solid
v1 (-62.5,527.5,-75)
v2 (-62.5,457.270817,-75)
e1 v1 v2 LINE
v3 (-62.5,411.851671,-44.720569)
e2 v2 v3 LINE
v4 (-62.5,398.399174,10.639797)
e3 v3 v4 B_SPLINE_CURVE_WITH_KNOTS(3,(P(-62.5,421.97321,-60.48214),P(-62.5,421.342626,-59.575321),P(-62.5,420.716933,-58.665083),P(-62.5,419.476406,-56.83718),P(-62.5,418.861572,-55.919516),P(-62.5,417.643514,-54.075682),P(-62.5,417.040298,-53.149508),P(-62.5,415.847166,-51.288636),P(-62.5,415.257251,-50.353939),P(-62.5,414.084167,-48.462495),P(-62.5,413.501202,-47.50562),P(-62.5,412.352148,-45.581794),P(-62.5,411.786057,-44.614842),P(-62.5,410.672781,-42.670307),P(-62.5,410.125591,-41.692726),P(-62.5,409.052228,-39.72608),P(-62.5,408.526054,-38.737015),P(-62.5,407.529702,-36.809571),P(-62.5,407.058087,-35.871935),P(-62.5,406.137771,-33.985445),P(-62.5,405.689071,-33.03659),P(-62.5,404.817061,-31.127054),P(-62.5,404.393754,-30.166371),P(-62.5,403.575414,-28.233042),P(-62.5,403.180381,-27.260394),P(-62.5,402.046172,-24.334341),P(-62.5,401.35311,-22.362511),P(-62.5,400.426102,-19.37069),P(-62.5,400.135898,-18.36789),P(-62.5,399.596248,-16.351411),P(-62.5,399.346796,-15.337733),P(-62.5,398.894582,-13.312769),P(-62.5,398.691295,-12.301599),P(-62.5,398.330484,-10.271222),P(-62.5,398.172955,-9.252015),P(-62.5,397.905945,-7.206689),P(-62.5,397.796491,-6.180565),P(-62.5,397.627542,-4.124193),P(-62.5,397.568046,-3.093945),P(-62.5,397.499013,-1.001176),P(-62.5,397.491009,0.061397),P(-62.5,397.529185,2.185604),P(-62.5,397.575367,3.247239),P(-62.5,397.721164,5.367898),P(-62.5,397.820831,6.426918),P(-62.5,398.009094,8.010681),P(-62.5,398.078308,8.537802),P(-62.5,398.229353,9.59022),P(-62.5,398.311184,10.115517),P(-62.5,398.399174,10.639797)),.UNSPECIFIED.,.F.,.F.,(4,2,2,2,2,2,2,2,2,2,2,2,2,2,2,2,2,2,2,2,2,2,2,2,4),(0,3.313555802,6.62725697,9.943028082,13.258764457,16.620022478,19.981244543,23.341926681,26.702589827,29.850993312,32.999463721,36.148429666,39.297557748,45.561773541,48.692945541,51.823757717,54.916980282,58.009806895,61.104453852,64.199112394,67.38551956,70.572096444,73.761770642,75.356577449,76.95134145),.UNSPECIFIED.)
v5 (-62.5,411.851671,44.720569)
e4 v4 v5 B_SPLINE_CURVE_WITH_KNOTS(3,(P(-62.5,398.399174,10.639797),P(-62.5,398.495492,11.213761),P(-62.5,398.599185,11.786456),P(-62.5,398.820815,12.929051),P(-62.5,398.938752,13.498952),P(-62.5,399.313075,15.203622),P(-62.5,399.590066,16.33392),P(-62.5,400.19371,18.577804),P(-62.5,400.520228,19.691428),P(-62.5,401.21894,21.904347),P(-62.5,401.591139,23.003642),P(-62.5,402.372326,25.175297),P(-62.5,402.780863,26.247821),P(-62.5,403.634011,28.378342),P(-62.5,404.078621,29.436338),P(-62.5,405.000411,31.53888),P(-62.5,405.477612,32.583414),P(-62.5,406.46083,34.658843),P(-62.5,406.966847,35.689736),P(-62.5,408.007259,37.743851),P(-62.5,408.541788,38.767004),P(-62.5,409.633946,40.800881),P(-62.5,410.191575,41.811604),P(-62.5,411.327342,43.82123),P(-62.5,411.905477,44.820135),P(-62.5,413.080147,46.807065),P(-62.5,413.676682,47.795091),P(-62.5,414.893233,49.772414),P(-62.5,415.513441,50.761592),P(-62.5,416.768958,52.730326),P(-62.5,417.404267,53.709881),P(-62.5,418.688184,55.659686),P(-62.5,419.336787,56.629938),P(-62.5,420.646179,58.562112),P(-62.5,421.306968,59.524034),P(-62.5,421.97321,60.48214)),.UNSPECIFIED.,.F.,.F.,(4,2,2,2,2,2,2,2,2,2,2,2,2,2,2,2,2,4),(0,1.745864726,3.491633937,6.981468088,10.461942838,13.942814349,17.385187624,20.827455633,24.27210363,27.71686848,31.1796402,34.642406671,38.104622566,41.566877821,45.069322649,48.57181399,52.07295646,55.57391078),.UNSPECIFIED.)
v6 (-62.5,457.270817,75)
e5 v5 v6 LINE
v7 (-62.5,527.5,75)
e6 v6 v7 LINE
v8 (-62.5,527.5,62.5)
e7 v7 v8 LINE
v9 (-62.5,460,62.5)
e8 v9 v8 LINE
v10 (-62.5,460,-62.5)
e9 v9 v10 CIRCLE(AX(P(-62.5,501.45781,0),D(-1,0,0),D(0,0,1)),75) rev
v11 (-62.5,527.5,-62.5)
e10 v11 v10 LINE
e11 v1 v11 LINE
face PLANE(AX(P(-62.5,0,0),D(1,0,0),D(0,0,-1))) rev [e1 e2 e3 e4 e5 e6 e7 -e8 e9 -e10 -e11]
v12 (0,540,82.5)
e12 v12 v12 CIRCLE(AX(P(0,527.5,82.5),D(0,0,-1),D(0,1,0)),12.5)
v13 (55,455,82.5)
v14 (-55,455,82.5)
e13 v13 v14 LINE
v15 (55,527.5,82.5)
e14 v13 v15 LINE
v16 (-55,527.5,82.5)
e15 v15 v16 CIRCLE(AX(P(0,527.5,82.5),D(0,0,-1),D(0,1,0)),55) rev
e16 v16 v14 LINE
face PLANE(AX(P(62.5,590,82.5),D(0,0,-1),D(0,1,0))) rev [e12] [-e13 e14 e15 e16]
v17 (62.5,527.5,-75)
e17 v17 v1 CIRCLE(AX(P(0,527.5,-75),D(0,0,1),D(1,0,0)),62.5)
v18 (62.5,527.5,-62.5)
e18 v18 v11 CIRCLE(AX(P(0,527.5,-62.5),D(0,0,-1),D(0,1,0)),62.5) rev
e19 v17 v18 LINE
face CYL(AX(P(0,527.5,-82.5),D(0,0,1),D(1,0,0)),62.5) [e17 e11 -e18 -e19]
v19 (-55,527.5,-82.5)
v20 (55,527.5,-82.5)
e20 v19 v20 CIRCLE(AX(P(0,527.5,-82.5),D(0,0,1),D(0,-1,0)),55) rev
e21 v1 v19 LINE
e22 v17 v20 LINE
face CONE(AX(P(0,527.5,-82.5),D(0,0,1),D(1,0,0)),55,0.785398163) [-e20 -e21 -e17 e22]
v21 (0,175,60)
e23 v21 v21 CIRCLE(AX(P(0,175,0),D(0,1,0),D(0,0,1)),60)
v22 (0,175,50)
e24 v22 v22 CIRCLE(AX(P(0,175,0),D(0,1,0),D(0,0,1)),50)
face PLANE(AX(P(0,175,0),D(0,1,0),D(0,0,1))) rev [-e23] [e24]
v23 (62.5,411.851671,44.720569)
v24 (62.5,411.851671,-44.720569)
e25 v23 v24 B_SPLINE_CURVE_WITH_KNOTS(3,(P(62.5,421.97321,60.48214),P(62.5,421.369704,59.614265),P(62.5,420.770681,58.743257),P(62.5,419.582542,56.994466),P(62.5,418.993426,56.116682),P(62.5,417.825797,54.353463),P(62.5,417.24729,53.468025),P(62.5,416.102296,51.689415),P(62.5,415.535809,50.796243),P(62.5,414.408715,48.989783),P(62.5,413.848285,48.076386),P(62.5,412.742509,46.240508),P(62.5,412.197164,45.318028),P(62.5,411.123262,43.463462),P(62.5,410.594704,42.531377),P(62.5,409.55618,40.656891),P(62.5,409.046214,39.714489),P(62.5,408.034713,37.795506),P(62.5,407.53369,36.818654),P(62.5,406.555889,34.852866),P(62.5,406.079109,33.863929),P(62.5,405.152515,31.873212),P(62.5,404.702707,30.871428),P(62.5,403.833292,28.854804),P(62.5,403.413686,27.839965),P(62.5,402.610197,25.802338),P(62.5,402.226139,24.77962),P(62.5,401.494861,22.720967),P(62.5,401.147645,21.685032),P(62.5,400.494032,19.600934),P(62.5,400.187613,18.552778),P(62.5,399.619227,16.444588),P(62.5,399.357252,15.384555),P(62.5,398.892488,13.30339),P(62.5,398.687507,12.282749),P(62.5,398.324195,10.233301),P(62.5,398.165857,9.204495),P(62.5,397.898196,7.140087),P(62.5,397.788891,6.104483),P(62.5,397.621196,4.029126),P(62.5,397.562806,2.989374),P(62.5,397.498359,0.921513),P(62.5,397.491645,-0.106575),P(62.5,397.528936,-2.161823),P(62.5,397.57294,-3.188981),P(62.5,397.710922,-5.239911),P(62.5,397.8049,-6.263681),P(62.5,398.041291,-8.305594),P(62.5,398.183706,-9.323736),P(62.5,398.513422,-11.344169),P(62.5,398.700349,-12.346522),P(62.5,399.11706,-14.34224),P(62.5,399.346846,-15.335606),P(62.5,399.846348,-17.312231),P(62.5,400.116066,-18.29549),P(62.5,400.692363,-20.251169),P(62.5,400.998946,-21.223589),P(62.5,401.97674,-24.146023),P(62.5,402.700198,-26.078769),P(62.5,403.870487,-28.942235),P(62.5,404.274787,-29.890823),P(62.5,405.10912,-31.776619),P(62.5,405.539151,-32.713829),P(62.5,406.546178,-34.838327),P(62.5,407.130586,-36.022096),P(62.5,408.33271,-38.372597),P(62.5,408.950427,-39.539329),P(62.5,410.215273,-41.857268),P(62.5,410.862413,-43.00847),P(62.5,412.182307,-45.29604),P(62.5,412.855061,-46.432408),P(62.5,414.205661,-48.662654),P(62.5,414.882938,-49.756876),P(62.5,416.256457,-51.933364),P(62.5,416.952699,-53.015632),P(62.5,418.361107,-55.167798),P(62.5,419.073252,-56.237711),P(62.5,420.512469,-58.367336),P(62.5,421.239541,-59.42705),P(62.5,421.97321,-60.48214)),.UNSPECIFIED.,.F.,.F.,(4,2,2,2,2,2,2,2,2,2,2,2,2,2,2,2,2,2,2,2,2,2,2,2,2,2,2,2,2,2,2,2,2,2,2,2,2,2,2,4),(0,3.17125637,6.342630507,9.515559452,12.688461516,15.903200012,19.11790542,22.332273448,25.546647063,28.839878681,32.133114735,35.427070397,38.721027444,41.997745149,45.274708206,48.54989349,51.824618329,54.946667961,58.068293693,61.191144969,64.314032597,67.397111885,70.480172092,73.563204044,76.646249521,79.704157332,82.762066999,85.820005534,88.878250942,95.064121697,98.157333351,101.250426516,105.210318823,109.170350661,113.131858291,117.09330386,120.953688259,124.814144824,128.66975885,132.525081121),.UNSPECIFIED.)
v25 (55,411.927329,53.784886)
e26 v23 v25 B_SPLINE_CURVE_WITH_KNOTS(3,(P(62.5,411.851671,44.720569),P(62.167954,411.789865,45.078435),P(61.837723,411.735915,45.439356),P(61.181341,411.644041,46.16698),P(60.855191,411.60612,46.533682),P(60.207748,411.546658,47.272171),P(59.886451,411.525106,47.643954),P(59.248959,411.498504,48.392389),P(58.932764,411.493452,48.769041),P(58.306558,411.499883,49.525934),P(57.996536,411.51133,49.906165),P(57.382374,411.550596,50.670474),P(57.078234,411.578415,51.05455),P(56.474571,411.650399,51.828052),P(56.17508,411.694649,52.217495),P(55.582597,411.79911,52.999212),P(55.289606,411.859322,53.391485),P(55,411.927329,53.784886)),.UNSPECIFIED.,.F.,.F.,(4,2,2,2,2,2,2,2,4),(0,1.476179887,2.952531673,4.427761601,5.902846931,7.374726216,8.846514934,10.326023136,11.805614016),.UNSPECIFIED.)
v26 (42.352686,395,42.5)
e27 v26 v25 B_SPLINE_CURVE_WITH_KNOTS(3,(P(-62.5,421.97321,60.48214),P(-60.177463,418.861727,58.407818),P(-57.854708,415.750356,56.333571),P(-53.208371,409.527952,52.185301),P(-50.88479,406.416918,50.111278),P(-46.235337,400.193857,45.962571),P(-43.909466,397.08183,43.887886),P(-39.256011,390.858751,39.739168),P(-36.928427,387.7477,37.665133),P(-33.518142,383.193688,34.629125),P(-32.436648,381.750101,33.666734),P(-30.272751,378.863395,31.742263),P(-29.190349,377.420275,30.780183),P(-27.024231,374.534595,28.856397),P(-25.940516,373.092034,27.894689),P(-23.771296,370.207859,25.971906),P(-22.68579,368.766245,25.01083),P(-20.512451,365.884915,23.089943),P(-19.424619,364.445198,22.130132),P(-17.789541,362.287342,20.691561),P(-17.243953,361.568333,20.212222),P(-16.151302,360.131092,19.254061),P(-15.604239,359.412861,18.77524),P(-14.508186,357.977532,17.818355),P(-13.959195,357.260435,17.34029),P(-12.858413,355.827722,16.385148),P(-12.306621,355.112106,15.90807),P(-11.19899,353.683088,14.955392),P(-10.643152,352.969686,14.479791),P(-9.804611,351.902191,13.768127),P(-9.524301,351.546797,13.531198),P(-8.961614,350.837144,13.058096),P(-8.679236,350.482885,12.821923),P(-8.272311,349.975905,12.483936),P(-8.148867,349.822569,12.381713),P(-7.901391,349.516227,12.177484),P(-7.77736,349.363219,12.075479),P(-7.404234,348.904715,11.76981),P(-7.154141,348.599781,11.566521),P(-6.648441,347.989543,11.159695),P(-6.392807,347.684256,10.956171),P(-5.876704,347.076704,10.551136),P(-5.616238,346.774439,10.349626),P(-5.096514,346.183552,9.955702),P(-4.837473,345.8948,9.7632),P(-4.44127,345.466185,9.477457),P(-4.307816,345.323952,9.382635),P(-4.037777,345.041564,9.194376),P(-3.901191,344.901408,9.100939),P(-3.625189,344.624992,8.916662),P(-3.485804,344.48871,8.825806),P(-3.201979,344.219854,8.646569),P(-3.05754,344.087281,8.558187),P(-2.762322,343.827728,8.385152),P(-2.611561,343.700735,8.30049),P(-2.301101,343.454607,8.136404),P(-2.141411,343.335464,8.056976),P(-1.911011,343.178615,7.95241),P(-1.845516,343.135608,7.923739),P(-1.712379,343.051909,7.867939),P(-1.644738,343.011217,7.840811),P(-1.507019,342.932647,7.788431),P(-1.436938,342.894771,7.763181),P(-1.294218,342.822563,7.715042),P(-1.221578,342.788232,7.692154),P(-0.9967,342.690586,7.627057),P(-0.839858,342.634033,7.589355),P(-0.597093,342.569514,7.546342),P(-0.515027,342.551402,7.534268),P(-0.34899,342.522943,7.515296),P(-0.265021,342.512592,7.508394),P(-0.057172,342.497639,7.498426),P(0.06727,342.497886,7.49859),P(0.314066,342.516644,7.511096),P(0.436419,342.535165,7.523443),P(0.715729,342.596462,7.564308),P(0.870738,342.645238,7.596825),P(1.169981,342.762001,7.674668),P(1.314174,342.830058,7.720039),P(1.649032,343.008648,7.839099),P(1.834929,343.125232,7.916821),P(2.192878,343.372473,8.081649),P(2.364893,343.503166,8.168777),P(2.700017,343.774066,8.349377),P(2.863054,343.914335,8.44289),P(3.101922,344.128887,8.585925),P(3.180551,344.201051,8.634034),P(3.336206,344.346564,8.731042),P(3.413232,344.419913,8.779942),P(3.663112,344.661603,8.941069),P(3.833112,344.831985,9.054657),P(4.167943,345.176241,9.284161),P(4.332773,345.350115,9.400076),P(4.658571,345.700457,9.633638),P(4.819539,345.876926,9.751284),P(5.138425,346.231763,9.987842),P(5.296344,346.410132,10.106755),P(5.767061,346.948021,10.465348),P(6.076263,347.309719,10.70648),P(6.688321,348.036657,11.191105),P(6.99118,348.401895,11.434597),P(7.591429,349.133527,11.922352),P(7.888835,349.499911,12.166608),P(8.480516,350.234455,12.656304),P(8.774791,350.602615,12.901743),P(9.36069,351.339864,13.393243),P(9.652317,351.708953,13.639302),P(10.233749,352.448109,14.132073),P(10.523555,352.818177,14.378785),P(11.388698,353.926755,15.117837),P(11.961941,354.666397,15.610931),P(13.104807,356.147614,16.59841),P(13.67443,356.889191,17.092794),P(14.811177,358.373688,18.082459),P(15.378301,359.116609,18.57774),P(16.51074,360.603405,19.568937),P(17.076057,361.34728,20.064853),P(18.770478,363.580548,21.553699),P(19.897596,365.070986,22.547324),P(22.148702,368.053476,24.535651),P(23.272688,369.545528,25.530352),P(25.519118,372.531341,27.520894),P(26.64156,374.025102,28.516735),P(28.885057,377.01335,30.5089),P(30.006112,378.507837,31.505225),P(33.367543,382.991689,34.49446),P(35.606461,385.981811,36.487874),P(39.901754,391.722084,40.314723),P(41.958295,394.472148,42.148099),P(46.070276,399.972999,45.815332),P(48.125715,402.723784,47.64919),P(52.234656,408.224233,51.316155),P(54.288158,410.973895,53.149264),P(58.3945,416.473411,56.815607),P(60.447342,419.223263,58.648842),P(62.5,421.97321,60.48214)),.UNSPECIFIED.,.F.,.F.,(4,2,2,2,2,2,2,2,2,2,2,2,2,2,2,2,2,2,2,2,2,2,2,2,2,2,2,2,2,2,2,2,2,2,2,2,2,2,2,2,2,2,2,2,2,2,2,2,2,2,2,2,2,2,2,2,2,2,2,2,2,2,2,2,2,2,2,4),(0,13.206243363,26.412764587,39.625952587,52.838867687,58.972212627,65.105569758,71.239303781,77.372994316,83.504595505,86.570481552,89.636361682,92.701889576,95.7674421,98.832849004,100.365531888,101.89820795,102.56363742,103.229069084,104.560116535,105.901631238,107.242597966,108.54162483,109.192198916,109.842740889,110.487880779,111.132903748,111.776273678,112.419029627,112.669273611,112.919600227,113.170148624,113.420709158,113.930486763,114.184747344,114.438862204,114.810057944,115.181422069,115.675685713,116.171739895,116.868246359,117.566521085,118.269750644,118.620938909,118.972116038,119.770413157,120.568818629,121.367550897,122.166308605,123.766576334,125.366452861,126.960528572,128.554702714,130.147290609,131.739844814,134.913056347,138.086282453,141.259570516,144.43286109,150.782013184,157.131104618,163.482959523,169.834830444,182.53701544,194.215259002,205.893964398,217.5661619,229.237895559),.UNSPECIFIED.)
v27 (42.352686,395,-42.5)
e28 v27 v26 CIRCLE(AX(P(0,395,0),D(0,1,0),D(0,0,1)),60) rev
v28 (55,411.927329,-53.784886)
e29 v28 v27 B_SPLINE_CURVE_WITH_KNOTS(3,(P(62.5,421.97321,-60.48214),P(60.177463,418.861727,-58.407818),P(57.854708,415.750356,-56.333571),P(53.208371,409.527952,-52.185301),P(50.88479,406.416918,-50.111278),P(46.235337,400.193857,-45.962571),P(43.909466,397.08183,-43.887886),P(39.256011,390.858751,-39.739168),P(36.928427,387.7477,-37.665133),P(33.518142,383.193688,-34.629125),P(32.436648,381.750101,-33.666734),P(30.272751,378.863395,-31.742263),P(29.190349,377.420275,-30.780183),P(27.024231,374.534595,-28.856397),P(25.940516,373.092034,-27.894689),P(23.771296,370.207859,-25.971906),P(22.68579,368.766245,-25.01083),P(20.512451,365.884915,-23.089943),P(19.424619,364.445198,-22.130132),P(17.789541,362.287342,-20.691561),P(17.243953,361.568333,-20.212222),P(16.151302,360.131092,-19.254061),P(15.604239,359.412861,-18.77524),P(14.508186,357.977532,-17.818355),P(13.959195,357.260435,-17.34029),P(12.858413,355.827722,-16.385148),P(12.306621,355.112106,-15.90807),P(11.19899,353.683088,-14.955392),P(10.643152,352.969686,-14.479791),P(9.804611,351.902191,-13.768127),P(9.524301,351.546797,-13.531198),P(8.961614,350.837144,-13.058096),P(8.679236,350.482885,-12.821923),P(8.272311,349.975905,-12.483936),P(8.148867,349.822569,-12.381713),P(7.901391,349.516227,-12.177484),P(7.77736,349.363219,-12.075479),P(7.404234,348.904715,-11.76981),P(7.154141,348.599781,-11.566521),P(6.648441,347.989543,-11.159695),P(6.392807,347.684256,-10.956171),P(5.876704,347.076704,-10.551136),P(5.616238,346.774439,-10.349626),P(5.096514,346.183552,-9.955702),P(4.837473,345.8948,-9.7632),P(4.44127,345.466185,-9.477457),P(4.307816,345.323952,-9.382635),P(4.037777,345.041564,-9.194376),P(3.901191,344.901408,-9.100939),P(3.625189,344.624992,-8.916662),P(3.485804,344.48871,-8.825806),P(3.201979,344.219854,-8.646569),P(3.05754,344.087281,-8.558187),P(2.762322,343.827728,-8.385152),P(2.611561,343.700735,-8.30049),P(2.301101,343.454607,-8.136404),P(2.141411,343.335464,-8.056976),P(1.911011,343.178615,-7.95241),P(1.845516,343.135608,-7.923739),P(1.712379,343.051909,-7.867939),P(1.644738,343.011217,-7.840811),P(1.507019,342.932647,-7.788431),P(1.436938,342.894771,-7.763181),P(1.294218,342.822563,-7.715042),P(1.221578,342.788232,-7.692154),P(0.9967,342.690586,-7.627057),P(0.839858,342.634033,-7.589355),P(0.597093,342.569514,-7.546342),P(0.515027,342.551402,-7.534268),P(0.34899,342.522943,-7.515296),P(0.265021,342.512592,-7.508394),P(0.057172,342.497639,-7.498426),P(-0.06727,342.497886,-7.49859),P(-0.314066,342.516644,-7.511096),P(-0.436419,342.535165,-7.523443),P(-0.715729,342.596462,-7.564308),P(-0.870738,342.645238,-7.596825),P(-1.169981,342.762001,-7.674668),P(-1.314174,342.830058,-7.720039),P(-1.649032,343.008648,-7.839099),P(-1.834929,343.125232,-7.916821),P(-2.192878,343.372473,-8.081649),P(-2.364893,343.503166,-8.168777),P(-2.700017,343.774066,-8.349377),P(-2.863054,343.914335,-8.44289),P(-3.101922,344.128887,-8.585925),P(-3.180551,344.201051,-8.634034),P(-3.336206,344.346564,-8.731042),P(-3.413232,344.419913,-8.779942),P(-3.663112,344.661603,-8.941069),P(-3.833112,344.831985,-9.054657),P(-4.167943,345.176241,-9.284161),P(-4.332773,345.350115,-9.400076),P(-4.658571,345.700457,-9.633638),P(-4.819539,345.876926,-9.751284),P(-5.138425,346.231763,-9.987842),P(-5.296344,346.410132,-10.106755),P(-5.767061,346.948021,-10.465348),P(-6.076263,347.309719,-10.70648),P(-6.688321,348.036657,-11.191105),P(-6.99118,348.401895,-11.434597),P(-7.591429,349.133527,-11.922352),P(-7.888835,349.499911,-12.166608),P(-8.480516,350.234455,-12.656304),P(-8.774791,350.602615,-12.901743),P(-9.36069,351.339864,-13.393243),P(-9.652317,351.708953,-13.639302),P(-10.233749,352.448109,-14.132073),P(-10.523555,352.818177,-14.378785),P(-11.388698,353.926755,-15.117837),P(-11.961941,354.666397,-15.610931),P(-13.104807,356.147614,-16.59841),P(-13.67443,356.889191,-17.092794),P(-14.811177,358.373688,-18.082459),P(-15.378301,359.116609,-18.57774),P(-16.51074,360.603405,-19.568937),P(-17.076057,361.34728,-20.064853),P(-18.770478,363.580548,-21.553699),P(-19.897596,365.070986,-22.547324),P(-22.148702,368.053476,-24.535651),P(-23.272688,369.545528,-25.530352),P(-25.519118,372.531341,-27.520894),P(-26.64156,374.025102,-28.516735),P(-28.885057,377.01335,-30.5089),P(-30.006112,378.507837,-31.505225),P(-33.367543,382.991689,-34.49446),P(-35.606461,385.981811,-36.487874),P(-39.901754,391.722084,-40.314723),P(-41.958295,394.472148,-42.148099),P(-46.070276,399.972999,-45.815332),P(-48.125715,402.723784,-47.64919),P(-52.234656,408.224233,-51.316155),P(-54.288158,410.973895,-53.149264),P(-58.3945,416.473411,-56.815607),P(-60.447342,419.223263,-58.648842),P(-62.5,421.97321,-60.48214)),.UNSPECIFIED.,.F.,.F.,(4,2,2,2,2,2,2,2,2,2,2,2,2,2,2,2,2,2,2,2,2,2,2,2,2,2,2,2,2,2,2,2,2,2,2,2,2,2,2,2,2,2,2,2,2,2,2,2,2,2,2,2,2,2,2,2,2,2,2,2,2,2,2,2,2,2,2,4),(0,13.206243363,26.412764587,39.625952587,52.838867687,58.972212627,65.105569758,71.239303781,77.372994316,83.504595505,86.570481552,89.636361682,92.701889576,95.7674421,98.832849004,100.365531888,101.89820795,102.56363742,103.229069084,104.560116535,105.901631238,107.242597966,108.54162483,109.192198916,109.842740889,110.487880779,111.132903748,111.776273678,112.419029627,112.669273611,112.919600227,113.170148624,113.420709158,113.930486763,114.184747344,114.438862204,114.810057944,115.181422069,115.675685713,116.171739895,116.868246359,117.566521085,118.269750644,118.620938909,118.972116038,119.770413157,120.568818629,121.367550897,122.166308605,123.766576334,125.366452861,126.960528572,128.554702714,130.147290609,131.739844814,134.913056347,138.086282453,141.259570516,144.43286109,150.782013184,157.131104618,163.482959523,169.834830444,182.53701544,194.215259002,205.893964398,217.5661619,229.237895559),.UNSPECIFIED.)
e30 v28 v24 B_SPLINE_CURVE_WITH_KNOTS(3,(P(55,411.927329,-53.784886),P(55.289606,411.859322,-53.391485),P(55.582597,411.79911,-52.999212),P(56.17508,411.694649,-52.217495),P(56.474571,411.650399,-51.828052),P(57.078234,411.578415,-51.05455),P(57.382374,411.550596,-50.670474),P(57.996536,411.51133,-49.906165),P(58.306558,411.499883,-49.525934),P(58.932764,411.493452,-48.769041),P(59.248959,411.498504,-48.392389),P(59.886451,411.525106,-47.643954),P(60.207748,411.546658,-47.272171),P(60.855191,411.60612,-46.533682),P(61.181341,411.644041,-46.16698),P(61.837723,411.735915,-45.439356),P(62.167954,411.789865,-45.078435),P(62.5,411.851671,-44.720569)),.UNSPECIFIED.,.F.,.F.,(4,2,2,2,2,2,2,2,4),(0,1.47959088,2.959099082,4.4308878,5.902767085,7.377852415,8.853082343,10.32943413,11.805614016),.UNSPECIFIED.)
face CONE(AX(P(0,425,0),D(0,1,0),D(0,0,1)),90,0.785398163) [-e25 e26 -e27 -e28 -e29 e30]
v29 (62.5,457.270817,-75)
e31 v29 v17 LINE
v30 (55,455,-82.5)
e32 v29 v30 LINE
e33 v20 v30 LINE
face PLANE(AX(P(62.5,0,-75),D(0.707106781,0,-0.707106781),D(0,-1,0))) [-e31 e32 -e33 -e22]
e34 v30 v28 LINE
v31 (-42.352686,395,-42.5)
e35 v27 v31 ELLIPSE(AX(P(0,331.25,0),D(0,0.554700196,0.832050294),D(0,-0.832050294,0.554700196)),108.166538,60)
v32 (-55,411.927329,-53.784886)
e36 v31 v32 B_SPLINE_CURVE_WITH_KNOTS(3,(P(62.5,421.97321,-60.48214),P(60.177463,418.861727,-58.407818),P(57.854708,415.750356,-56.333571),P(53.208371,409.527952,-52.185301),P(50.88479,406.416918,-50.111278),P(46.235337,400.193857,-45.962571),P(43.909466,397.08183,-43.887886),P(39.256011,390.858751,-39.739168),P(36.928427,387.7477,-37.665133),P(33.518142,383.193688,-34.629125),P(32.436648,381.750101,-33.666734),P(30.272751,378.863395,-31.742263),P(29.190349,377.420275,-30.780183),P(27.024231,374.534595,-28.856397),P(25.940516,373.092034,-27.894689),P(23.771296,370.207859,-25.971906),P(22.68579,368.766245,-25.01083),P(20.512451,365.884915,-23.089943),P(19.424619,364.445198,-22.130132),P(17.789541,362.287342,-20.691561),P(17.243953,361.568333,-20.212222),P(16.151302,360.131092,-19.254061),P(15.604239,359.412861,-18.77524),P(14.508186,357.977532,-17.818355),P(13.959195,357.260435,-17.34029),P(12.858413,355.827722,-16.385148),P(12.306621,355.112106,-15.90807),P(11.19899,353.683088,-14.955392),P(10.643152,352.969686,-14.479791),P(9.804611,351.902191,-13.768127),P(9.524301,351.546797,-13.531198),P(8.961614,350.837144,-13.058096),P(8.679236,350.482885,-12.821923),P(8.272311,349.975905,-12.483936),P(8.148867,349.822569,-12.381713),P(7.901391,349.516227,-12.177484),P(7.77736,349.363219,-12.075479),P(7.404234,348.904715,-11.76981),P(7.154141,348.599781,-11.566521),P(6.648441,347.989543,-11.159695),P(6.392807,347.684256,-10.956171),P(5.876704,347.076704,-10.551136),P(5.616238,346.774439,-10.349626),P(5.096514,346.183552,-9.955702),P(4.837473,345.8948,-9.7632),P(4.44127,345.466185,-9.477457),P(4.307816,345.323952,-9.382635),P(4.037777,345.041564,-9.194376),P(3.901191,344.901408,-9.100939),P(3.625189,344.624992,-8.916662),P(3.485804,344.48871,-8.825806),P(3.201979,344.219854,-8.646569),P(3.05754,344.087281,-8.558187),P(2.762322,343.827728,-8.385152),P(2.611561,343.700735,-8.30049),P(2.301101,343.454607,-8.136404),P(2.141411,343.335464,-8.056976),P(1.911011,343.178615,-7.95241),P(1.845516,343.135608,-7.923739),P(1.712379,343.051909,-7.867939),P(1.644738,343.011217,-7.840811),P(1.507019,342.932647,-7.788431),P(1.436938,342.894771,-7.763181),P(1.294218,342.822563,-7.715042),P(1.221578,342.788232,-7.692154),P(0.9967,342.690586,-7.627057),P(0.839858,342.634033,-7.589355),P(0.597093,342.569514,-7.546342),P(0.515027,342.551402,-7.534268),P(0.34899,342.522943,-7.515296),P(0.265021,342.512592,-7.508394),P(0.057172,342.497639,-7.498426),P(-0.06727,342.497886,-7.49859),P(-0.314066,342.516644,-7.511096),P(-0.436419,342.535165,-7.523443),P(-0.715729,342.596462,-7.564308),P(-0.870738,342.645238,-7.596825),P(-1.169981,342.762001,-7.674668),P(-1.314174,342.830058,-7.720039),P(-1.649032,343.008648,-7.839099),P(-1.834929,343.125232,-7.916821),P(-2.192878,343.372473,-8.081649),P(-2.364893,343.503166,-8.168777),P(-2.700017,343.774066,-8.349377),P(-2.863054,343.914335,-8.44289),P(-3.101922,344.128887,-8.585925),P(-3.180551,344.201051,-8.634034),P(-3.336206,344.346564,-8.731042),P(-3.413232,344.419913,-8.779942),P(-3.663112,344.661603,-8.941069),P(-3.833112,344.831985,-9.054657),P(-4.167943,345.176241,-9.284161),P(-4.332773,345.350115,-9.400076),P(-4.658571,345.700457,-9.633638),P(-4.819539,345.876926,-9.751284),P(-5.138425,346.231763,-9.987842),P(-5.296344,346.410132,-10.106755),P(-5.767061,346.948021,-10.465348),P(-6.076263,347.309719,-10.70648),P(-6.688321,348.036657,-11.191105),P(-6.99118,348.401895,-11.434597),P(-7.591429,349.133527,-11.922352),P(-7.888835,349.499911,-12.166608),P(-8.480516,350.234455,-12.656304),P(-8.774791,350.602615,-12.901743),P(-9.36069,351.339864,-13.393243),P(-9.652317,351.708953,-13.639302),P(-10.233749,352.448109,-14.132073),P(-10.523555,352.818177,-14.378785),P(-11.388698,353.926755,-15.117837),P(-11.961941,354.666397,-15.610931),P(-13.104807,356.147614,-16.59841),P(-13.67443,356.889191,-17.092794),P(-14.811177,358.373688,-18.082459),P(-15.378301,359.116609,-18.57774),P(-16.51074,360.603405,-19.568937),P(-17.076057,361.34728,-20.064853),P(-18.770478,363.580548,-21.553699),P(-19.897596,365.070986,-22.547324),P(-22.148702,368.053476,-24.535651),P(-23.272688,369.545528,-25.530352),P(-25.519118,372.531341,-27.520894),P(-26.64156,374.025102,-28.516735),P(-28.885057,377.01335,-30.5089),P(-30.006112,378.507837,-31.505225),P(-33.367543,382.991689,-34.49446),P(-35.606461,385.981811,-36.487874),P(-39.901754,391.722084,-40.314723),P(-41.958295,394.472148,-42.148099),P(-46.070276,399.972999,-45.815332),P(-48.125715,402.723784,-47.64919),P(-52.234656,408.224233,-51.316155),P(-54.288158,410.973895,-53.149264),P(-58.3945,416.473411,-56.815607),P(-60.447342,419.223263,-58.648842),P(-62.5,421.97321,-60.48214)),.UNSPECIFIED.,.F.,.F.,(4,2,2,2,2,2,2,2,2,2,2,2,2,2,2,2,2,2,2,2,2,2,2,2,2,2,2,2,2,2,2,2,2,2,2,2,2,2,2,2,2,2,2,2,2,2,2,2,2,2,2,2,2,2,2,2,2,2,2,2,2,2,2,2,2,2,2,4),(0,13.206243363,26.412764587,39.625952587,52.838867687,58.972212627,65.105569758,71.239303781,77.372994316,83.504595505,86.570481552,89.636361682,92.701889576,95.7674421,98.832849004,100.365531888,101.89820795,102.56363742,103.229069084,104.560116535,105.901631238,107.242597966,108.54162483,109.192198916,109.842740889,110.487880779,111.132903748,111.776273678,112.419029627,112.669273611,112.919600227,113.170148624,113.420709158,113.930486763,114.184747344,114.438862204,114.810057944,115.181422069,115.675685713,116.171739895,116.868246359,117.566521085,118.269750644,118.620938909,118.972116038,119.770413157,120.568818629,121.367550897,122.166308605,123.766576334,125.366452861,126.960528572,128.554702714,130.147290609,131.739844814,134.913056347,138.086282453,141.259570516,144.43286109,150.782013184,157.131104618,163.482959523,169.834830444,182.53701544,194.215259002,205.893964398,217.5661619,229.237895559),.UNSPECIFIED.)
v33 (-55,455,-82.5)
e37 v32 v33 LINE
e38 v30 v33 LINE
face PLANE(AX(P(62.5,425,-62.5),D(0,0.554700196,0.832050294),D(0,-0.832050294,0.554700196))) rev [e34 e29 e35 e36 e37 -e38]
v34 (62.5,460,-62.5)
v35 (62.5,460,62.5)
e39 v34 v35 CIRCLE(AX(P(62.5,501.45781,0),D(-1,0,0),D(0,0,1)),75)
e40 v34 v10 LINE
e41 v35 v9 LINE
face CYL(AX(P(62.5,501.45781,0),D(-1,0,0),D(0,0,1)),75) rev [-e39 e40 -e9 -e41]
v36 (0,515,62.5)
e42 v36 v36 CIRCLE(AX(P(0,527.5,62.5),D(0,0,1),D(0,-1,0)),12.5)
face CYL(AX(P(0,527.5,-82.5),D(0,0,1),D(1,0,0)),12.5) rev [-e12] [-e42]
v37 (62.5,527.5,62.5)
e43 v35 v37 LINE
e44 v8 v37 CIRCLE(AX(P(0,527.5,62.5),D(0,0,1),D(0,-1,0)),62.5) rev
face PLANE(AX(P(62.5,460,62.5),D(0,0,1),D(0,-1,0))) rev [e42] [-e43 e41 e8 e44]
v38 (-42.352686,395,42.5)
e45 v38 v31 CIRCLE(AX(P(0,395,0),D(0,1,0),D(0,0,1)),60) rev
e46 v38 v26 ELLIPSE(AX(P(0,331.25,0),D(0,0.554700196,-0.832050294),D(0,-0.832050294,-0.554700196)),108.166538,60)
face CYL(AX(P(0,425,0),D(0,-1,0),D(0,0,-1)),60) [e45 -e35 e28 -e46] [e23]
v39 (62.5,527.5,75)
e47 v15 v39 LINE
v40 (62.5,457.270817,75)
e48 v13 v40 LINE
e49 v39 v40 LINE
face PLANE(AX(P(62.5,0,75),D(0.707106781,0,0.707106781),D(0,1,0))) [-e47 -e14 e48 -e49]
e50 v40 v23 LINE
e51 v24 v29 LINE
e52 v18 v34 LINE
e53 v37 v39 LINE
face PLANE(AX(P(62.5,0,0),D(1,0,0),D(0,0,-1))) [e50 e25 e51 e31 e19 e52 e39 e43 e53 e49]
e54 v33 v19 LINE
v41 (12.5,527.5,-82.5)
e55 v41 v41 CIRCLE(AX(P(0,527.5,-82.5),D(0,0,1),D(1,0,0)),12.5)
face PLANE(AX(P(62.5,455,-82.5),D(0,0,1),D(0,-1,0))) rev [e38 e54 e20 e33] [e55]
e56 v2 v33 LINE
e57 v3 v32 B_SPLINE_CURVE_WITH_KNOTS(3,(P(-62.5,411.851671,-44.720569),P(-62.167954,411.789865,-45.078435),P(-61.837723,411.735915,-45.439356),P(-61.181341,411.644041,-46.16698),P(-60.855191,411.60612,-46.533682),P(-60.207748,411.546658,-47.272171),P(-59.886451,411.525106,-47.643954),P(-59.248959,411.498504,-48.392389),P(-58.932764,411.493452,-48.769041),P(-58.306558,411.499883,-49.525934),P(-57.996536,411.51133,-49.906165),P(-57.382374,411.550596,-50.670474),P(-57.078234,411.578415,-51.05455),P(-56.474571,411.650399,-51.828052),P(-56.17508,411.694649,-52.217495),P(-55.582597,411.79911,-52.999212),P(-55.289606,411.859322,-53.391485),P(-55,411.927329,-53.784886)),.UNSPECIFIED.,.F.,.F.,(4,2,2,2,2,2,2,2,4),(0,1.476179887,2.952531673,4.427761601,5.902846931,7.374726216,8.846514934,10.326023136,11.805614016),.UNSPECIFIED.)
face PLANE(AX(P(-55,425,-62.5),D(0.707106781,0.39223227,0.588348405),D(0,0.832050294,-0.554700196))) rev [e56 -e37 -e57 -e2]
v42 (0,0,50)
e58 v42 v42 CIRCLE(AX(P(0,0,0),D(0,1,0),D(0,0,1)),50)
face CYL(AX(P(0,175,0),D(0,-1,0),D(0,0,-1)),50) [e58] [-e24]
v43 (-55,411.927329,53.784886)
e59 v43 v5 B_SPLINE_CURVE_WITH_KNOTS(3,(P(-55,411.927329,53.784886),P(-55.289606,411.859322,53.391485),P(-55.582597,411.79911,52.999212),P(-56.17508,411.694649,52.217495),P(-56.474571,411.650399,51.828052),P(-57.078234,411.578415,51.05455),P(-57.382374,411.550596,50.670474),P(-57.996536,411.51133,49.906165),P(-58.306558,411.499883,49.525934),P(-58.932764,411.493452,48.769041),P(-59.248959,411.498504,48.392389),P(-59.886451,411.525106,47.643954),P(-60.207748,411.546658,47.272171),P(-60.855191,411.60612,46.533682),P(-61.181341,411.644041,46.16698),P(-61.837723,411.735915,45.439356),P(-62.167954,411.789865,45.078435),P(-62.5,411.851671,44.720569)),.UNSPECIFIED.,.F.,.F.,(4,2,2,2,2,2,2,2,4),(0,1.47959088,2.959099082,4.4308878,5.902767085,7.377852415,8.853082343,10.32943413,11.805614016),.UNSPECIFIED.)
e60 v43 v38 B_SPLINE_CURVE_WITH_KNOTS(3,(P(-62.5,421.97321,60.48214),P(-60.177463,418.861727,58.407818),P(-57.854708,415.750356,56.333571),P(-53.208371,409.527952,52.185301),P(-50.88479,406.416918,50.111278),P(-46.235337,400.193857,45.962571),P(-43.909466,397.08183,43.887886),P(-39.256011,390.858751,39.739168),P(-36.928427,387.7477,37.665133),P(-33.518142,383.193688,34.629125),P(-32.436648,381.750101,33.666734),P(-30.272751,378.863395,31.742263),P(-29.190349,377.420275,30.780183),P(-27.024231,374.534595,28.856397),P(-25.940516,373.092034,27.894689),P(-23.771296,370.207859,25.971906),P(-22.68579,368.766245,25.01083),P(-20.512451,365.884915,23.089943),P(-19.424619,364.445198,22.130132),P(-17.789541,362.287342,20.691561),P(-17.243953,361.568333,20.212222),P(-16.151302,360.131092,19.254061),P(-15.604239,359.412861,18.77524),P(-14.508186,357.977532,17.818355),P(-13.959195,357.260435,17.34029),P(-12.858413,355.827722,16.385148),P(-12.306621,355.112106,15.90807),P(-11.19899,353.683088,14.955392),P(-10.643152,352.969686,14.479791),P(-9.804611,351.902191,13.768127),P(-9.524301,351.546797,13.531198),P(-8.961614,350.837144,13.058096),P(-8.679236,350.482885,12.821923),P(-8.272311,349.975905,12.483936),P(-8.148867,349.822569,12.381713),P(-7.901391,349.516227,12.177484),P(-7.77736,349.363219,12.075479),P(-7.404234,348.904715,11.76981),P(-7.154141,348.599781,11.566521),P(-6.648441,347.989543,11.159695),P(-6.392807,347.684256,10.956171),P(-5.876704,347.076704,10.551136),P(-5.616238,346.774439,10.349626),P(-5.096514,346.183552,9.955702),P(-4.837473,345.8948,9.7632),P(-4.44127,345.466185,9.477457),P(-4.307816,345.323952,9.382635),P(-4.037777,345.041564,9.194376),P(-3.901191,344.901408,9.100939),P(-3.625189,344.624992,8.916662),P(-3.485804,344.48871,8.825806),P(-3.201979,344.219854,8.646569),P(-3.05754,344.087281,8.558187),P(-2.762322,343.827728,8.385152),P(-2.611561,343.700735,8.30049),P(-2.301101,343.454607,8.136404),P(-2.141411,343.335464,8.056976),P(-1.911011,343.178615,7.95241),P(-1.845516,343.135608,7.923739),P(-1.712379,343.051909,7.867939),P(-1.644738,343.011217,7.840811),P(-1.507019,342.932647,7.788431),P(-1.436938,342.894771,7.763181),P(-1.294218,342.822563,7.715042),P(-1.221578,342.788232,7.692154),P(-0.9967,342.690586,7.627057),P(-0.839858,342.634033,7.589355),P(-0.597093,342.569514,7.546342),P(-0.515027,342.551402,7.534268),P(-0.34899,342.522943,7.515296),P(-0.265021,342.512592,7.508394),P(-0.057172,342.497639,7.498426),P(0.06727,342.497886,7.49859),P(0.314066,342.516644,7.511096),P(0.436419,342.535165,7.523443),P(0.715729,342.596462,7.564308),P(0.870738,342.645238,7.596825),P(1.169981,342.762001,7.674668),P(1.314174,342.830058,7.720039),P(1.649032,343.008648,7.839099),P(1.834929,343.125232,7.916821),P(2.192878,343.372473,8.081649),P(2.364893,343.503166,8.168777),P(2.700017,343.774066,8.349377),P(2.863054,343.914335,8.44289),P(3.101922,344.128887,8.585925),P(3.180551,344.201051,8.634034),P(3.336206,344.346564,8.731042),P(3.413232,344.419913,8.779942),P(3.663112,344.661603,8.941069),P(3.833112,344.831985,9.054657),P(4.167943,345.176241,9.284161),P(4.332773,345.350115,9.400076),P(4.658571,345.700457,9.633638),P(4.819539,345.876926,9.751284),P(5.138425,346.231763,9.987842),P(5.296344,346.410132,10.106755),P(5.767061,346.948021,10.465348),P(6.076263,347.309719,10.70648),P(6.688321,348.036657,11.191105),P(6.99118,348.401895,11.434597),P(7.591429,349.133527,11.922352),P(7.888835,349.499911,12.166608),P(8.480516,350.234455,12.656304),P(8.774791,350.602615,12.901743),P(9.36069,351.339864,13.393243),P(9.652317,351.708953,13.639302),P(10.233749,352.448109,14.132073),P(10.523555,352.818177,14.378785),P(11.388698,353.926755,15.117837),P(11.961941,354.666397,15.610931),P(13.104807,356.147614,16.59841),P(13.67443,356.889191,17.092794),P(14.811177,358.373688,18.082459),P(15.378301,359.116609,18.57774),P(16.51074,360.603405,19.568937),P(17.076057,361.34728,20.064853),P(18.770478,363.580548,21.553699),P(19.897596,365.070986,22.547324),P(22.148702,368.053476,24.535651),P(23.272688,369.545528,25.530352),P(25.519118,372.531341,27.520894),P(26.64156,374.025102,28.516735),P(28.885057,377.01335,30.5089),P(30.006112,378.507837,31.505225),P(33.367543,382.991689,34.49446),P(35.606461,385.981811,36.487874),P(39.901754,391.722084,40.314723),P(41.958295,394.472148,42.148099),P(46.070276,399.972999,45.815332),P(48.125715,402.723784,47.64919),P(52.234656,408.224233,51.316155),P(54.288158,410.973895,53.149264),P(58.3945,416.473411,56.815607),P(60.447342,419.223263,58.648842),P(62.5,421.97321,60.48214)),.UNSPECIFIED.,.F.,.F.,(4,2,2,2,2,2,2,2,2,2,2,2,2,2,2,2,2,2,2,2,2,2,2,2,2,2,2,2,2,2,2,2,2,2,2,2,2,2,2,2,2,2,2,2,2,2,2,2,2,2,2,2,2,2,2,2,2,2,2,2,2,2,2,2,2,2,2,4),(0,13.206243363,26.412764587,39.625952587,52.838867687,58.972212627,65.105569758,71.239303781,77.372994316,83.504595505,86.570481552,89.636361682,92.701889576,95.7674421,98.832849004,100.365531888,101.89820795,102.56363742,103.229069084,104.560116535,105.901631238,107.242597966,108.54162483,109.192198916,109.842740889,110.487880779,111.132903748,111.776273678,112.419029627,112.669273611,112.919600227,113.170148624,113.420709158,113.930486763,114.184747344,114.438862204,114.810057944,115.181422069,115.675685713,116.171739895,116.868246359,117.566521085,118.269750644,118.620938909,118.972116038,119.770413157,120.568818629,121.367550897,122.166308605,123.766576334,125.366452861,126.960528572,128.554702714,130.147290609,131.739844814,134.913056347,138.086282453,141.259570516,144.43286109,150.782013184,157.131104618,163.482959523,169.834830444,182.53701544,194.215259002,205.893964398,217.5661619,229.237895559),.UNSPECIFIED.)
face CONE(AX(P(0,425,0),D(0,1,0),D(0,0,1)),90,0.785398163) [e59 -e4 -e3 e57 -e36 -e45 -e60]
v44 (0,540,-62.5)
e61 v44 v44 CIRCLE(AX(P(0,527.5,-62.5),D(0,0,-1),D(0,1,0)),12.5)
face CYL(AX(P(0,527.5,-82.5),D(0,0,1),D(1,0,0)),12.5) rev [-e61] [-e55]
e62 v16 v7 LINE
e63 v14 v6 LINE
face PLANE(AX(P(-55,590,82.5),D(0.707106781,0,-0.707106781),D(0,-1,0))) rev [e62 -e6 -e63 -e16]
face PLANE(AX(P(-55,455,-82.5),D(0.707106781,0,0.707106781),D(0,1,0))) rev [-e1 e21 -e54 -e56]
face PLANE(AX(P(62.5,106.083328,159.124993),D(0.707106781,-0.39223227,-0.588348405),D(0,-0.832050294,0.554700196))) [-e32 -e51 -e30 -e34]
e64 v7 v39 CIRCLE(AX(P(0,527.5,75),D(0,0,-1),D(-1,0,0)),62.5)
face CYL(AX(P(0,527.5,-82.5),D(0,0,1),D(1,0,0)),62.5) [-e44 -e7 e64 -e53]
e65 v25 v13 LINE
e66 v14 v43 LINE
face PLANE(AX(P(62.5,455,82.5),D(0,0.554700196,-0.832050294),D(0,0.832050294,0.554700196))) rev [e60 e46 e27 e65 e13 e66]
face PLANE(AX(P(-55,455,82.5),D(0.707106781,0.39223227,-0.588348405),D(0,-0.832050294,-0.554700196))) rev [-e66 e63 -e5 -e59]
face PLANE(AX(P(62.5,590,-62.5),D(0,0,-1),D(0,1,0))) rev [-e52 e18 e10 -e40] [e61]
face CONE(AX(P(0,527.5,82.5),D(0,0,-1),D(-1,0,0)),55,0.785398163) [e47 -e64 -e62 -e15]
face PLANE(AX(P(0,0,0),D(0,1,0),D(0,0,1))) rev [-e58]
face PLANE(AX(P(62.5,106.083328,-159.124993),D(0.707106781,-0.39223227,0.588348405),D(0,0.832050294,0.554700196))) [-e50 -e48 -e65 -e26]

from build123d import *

# Parameters (mm, degrees)
SKETCH1_R               = 50
BOSS_EXTRUDE1_DEPTH     = 175
SKETCH4_R               = 60
BOSS_EXTRUDE3_DEPTH     = 250
BOSS_EXTRUDE4_DEPTH     = 62.5
CUT_EXTRUDE2_DEPTH      = 616.817546031
CUT_EXTRUDE2_DEPTH_BACK = 616.817546031
SKETCH6_R               = 12.5
CHAMFER2_SIZE           = 30
CHAMFER3_SIZE           = 7.5
CUT_EXTRUDE3_DEPTH      = 609.712781203
CUT_EXTRUDE3_DEPTH_BACK = 609.712781203


with BuildPart() as part:
    # Sketch1 → Boss-Extrude1 (new body)
    with BuildSketch(Plane(origin=(0, 0, 0), x_dir=(1, 0, 0), z_dir=(0, 1, 0))):
        with Locations(Location((0, 0, 0), (0, 0, 270))):
            Circle(SKETCH1_R)
    extrude(amount=BOSS_EXTRUDE1_DEPTH)

    # Sketch4 → Boss-Extrude3 (add)
    with BuildSketch(Plane(origin=(0, 175, 0), x_dir=(1, 0, 0), z_dir=(0, 1, 0))):
        with Locations(Location((0, 0, 0), (0, 0, 270))):
            Circle(SKETCH4_R)
    extrude(amount=BOSS_EXTRUDE3_DEPTH)

    # Sketch5 → Boss-Extrude4 (add, symmetric)
    with BuildSketch(Plane(origin=(0, 0, 0), x_dir=(0, 0, -1), z_dir=(1, 0, 0))):
        Polygon((-62.5, 425), (62.5, 425), (82.5, 455), (82.5, 590), (62.5, 590), (62.5, 460), (-62.5, 460), (-62.5, 590), (-82.5, 590), (-82.5, 455), align=None)
    extrude(amount=BOSS_EXTRUDE4_DEPTH, both=True)

    # Sketch6 → Cut-Extrude2 (cut, two sides: drawn at the far end of the back side and taken through both)
    with BuildSketch(Plane.XY.offset(82.5).offset(-CUT_EXTRUDE2_DEPTH_BACK)):
        with Locations(Location((0, 527.5, 0), (0, 0, 90))):
            Circle(SKETCH6_R)
        with BuildLine():
            Line((-62.5, 527.5), (-67.5, 527.5))
            Line((-67.5, 527.5), (-67.5, 595))
            Line((-67.5, 595), (67.5, 595))
            Line((67.5, 595), (67.5, 527.5))
            Line((67.5, 527.5), (62.5, 527.5))
            ThreePointArc((62.5, 527.5), (0, 590), (-62.5, 527.5))
        make_face()
    extrude(amount=CUT_EXTRUDE2_DEPTH + CUT_EXTRUDE2_DEPTH_BACK, mode=Mode.SUBTRACT)

    # Chamfer2
    # the kernel refuses this chamfer: 30 mm, written as the material it adds along each edge
    with BuildSketch(Plane(origin=(0, 425, 0), x_dir=(0, 0, 1), z_dir=(-1, 0, 0))) as chamfer2_piece_1_section:
        Polygon((60 + CHAMFER2_SIZE, 0), (60, -CHAMFER2_SIZE), (60, 0), align=None)
    chamfer2_piece_1 = revolve(axis=Axis((0, 425, 0), (0, 1, 0)), mode=Mode.PRIVATE)
    chamfer2_piece_1 = split(chamfer2_piece_1, bisect_by=Plane(origin=(-62.5, 399.085825085, 31.840161024), z_dir=(1, 0, 0)), keep=Keep.TOP, mode=Mode.PRIVATE)
    chamfer2_piece_1 = split(chamfer2_piece_1, bisect_by=Plane(origin=(54.930093835, 392.908722455, 41.10581497), z_dir=(0, 0.5547001962252294, -0.8320502943378435)), keep=Keep.TOP, mode=Mode.PRIVATE)
    chamfer2_piece_1 = split(chamfer2_piece_1, bisect_by=Plane(origin=(54.930093835, 363.517804586, -21.511869724), z_dir=(0, 0.5547001962252294, 0.8320502943378435)), keep=Keep.TOP, mode=Mode.PRIVATE)
    chamfer2_piece_1 = split(chamfer2_piece_1, bisect_by=Plane(origin=(62.5, 399.085825085, 31.840161024), z_dir=(-1, 0, 0)), keep=Keep.TOP, mode=Mode.PRIVATE)
    add(chamfer2_piece_1)

    # Chamfer3
    chamfer3_edges = [part.edges().sort_by_distance(p)[0] for p in [
        (-62.5, 438.486605007, 71.491070005),
        (-62.5, 438.486605007, -71.491070005),
        (-62.5, 491.25, -82.5),
        (62.5, 438.486605007, 71.491070005),
        (62.5, 438.486605007, -71.491070005),
        (62.5, 491.25, -82.5),
        (-62.5, 491.25, 82.5),
        (62.5, 491.25, 82.5),
        (0, 590, -82.5),
    ]]
    chamfer(chamfer3_edges, length=CHAMFER3_SIZE)

    # Sketch7 → Cut-Extrude3 (cut, two sides: drawn at the far end of the back side and taken through both)
    with BuildSketch(Plane.ZY.offset(62.5).offset(-CUT_EXTRUDE3_DEPTH_BACK)):
        with BuildLine():
            Line((-62.5, 460), (62.5, 460))
            ThreePointArc((62.5, 460), (0, 426.457809879), (-62.5, 460))
        make_face()
    extrude(amount=CUT_EXTRUDE3_DEPTH + CUT_EXTRUDE3_DEPTH_BACK, mode=Mode.SUBTRACT)


solid = part.part
